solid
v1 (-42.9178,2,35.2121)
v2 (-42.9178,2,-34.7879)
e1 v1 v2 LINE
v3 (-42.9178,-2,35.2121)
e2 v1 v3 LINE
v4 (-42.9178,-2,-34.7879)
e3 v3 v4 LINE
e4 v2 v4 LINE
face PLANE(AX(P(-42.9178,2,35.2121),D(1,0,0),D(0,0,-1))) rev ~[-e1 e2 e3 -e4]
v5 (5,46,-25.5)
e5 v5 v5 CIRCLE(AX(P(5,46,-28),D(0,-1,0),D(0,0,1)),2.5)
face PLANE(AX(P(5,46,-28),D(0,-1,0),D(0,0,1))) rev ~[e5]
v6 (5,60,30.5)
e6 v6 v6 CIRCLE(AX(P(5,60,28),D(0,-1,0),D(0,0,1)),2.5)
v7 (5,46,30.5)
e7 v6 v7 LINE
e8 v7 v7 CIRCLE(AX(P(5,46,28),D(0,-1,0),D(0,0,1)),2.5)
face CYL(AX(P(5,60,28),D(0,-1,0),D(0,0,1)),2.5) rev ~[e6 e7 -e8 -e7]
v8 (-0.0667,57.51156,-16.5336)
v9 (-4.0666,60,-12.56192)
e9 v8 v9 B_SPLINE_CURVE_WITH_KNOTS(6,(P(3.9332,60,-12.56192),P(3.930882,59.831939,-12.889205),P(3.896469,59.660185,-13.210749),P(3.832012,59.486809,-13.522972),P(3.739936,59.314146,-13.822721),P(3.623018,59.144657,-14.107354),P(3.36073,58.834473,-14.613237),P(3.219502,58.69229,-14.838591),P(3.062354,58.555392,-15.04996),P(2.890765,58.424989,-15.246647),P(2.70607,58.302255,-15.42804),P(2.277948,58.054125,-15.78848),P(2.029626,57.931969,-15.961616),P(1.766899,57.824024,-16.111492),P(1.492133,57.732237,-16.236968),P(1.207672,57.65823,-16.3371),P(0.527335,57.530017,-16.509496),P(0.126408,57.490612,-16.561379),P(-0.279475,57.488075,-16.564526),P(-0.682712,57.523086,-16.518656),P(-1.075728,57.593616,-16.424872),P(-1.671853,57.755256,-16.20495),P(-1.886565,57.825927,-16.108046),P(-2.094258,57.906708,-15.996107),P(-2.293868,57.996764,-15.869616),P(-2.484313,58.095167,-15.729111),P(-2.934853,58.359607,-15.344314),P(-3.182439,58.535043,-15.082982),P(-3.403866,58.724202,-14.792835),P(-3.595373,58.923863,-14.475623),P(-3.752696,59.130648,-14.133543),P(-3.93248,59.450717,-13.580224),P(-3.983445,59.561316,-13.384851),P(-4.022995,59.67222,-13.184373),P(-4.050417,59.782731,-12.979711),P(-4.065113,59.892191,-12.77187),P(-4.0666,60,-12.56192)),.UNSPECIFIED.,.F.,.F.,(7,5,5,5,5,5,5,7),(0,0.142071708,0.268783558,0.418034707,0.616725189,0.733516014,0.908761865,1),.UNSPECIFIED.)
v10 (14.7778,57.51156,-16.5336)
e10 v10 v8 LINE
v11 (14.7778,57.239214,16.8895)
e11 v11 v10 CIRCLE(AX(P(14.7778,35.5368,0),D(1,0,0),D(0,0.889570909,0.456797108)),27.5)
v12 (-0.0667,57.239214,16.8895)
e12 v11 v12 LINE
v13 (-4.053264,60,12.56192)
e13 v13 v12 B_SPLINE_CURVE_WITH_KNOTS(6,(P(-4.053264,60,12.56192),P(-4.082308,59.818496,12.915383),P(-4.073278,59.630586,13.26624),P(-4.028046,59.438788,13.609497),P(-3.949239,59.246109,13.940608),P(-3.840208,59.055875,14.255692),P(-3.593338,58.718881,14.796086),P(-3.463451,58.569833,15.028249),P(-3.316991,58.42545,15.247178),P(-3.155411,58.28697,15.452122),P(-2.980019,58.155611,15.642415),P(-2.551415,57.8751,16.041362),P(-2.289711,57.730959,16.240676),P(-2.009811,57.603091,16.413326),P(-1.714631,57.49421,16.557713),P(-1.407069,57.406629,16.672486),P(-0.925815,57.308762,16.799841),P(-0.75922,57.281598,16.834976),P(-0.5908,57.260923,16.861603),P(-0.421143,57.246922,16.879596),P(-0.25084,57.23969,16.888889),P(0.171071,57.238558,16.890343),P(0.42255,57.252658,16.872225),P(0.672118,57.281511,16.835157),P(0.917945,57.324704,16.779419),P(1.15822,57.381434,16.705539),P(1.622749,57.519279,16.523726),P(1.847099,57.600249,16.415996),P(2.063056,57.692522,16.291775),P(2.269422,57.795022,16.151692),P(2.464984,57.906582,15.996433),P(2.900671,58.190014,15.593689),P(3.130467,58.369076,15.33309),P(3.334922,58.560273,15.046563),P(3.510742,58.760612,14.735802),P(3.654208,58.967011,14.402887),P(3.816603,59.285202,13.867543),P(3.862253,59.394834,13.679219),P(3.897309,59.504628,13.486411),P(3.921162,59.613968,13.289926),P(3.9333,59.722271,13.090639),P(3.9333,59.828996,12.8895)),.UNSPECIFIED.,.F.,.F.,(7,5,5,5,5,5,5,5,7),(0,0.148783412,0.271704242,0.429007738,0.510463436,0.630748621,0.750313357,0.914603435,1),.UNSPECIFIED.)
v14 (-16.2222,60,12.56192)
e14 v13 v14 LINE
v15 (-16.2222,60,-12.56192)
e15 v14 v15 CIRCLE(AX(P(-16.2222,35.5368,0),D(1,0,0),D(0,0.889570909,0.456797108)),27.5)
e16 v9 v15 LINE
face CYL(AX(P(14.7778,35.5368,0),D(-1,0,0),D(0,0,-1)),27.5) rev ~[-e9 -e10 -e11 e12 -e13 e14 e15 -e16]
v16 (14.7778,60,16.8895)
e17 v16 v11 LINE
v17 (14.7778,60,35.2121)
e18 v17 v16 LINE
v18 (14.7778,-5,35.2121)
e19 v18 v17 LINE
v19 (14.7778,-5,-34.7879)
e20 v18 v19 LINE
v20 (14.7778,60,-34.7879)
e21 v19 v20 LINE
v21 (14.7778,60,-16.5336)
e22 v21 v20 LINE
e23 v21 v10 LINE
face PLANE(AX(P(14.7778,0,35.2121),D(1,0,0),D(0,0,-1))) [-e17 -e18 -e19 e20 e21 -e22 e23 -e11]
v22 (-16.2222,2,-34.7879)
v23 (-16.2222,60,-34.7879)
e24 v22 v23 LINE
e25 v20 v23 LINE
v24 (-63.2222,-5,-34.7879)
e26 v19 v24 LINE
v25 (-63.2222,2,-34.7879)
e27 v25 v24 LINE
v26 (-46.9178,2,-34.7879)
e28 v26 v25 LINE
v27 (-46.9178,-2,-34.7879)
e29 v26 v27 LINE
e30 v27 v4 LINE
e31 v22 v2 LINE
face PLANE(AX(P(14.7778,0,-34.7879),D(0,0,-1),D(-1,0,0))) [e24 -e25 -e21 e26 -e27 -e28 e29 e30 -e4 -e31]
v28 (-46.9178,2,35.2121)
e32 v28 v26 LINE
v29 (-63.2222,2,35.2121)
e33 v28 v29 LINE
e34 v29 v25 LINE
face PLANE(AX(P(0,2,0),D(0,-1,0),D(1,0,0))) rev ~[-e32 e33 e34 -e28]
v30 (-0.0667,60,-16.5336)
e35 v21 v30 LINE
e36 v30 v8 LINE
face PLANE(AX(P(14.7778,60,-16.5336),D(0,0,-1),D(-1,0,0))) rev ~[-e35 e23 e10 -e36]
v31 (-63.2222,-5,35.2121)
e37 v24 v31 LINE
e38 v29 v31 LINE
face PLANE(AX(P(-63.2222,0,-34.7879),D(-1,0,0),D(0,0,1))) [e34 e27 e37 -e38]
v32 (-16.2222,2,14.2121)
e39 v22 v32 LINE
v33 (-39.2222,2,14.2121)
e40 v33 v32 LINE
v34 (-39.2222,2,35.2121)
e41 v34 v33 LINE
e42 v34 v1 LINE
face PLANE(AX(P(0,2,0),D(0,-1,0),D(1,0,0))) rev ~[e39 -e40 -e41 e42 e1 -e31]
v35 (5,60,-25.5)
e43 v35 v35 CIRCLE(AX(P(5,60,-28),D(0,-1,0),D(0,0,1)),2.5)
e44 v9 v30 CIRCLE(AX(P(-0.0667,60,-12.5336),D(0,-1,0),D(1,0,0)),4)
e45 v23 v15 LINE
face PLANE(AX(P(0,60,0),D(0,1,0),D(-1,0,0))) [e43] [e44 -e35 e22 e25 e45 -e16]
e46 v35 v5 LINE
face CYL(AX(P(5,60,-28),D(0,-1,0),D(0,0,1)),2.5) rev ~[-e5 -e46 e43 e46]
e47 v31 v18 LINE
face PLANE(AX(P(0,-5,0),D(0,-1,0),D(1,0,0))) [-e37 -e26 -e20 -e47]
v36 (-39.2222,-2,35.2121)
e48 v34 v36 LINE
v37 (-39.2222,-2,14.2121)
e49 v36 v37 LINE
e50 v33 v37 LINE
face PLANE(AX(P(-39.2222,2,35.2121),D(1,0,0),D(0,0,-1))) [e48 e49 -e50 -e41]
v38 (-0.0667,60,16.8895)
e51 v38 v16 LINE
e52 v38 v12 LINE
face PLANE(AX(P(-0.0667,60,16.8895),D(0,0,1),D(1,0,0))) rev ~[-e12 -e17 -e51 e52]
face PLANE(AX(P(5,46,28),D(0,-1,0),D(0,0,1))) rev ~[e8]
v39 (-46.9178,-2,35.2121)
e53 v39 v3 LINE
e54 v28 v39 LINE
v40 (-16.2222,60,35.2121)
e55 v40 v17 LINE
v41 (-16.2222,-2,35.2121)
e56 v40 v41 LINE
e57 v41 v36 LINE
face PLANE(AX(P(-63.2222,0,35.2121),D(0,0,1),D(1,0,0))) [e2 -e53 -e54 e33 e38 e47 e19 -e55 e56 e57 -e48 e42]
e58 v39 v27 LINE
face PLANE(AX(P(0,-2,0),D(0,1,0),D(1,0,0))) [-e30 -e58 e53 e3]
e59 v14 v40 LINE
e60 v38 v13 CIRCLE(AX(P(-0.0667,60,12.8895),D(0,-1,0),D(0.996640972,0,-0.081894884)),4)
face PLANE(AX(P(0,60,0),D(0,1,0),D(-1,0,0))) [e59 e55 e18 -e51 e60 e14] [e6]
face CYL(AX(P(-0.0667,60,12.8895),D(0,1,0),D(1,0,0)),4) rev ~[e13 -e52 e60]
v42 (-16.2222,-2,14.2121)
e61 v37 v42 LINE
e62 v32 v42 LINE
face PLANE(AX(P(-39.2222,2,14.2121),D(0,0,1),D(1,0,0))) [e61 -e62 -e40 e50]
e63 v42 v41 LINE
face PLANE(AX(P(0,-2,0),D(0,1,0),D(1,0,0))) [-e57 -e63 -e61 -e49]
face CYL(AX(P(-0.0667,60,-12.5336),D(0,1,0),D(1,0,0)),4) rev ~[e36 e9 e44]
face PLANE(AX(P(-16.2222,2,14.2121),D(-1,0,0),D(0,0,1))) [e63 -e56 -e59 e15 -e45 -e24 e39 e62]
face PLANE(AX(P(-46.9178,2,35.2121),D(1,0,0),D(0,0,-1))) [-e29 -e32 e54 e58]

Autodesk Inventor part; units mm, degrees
ref_plane "YZ Plane" through (0, 0, 0) normal (1, 0, 0) x (0, 1, 0)
ref_plane "XZ Plane" through (0, 0, 0) normal (0, 1, 0) x (-1, 0, 0)
ref_plane "XY Plane" through (0, 0, 0) normal (0, 0, 1) x (1, 0, 0)
sketch "Sketch1" plane through (0, 0, 0) normal (0, 1, 0) x (-1, 0, 0)
  line L0 (16.2222, 35.2121) -> (-14.7778, 35.2121)
  line L1 (-14.7778, 35.2121) -> (-14.7778, -34.7879)
  line L2 (-14.7778, -34.7879) -> (16.2222, -34.7879)
  line L3 (16.2222, -34.7879) -> (16.2222, 35.2121)
  point P0 (0, 0)
  dimension "d0" = 70
  dimension "d1" = 31
extrude "Extrusion1" add sketch "Sketch1" along normal blind 60
sketch "Sketch3" plane through (14.7778, 0, 35.2121) normal (1, 0, 0) x (0, 0, -1)
  circle A0 centre (35.2121, 35.5368) radius 27.5
  point P0 (35.2121, 0)
  dimension "d5" = 55
hole "Hole1" at (14.7778, 35.5368, 0) direction (-1, 0, 0) diameter 55 end through all
sketch "Sketch6" plane through (0, 60, 0) normal (0, 1, 0) x (1, 0, 0)
  line L0 (-0.0667, -13.4045) -> (-0.0667, 12.7365)
  line L1 (-16.2222, 0) -> (14.7778, 0) construction
  circle A0 centre (-0.0667, -12.8895) radius 4
  circle A1 centre (-0.0667, 12.5336) radius 4
  point P0 (0, 0)
  point P1 (14.7778, -12.562)
  point P2 (-16.2222, -12.562)
  point P3 (-16.2222, 12.562)
  point P4 (14.7778, 12.562)
  dimension "d42" = 8
  dimension "d43" = 8
sketch "Sketch8" plane through (0, 60, 0) normal (0, 1, 0) x (1, 0, 0)
  line L0 (14.7778, 34.7879) -> (-16.2222, 34.7879) construction
  line L1 (-16.2222, 0) -> (14.7778, 0) construction
  circle A0 centre (5, -28) radius 2
  circle A1 centre (5, 28) radius 2
  point P0 (0, 0)
  dimension "d33" = 4
extrude "Extrusion4" cut sketch "Sketch6" against normal blind 4
sketch "Sketch15" plane through (0, 60, 0) normal (0, 1, 0) x (1, 0, 0)
  arc A0 (-4.0532, -12.562) -> (3.9199, -12.562) centre (-0.0667, -12.8895) ccw projected
  line L0 (-0.0667, -16.8895) -> (14.7778, -16.8895)
  line L1 (14.7778, 27.5) -> (14.7778, -27.5) projected
  line L2 (14.7778, -12.562) -> (14.7778, -16.8895)
  line L3 (14.7778, -12.562) -> (3.9199, -12.562) projected
  line L4 (-0.0667, -12.8895) -> (-0.0667, -12.8895)
  arc A1 (3.9332, 12.562) -> (-4.0666, 12.562) centre (-0.0667, 12.5336) ccw projected
  line L5 (-0.0667, 16.5336) -> (-0.0667, 12.5336)
  line L6 (3.9332, 12.562) -> (14.7778, 12.562) projected
  line L7 (14.7778, 12.562) -> (14.7778, 16.5336)
  line L8 (14.7778, 16.5336) -> (-0.0667, 16.5336)
  line L9 (-0.0667, -12.562) -> (14.7778, -12.562)
  line L10 (-0.0667, -12.562) -> (-0.0667, -16.8895)
  line L11 (14.7778, 12.562) -> (-0.0667, 12.5336)
  point P0 (0, 0)
extrude "Extrusion5" cut sketch "Sketch15" against normal blind 4 contours A0 L3 L1 L0 | L1 L6 A1 L8
hole "Hole5" at (5, 60, 28) at (5, 60, -28) direction (0, -1, 0) diameter 5 depth 14
sketch "Sketch18" plane through (0, 0, 0) normal (0, -1, 0) x (1, 0, 0)
  line L0 (-16.2222, -34.7879) -> (-63.2222, -34.7879)
  line L1 (-16.2222, 35.2121) -> (-63.2222, 35.2121)
  line L2 (-63.2222, 35.2121) -> (-63.2222, -34.7879)
  line L3 (-16.2222, -34.7879) -> (-16.2222, 35.2121)
  line L4 (-63.2222, -34.7879) -> (-63.2222, 35.2121)
  point P0 (0, 0)
  dimension "d57" = 47
extrude "Extrusion9" add sketch "Sketch18" against normal blind 2
sketch "Sketch25" plane through (0, 0, 0) normal (0, -1, 0) x (1, 0, 0)
  line L0 (-63.2222, 35.2121) -> (14.7778, 35.2121)
  line L1 (14.7778, 35.2121) -> (14.7778, -34.7879)
  line L2 (14.7778, -34.7879) -> (-63.2222, -34.7879)
  line L3 (-63.2222, -34.7879) -> (-63.2222, 35.2121)
  point P0 (0, 0)
extrude "Extrusion11" add sketch "Sketch25" along normal blind 5
sketch "Sketch29" plane through (0, 2, 0) normal (0, 1, 0) x (1, 0, 0)
  point P0 (0, 0)
sketch "Sketch35" plane through (-63.2222, -5, 35.2121) normal (0, 0, 1) x (1, 0, 0)
  line L0 (42.5, 127.0601) -> (62.5, 127.0601)
  line L1 (62.5, 127.0601) -> (62.5, 71.1035)
  line L2 (62.5, 119.9853) -> (62.5, 78.9853) projected
  line L3 (62.5, 71.1035) -> (42.5, 71.1035)
  line L4 (42.5, 71.1035) -> (42.5, 127.0601)
  line L5 (42.5, 78.9853) -> (42.5, 119.9853) projected
  point P0 (63.2222, 5)
extrude "Extrusion20" cut sketch "Sketch35" against normal blind 21
sketch "Sketch37" plane through (0, 2, 0) normal (0, 1, 0) x (1, 0, 0)
  line L0 (-63.2222, -35.2121) -> (-16.2222, -35.2121) projected
  line L1 (-42.9178, -35.2121) -> (-46.9178, -35.2121)
  line L2 (-46.9178, -35.2121) -> (-46.9178, 34.7879)
  line L3 (-63.2222, 34.7879) -> (14.7778, 34.7879) projected
  line L4 (-46.9178, 34.7879) -> (-42.9178, 34.7879)
  line L5 (-42.9178, -35.2121) -> (-42.9178, 34.7879)
  point P0 (0, 0)
  dimension "d140" = 4
sketch "Sketch39" plane through (0, 2, 0) normal (0, 1, 0) x (1, 0, 0)
  line L0 (-16.2222, -35.2121) -> (-39.2222, -35.2121)
  line L1 (-39.2222, -35.2121) -> (-39.2222, -14.2121)
  line L2 (-39.2222, -14.2121) -> (-16.2222, -14.2121)
  line L3 (-16.2222, -14.2121) -> (-16.2222, -35.2121)
  point P0 (0, 0)
  dimension "d120" = 23
  dimension "d121" = 21
extrude "Extrusion25" cut sketch "Sketch39" against normal blind 4
extrude "Extrusion26" cut sketch "Sketch37" against normal blind 4
properties part number "Noke_holder_latch"
